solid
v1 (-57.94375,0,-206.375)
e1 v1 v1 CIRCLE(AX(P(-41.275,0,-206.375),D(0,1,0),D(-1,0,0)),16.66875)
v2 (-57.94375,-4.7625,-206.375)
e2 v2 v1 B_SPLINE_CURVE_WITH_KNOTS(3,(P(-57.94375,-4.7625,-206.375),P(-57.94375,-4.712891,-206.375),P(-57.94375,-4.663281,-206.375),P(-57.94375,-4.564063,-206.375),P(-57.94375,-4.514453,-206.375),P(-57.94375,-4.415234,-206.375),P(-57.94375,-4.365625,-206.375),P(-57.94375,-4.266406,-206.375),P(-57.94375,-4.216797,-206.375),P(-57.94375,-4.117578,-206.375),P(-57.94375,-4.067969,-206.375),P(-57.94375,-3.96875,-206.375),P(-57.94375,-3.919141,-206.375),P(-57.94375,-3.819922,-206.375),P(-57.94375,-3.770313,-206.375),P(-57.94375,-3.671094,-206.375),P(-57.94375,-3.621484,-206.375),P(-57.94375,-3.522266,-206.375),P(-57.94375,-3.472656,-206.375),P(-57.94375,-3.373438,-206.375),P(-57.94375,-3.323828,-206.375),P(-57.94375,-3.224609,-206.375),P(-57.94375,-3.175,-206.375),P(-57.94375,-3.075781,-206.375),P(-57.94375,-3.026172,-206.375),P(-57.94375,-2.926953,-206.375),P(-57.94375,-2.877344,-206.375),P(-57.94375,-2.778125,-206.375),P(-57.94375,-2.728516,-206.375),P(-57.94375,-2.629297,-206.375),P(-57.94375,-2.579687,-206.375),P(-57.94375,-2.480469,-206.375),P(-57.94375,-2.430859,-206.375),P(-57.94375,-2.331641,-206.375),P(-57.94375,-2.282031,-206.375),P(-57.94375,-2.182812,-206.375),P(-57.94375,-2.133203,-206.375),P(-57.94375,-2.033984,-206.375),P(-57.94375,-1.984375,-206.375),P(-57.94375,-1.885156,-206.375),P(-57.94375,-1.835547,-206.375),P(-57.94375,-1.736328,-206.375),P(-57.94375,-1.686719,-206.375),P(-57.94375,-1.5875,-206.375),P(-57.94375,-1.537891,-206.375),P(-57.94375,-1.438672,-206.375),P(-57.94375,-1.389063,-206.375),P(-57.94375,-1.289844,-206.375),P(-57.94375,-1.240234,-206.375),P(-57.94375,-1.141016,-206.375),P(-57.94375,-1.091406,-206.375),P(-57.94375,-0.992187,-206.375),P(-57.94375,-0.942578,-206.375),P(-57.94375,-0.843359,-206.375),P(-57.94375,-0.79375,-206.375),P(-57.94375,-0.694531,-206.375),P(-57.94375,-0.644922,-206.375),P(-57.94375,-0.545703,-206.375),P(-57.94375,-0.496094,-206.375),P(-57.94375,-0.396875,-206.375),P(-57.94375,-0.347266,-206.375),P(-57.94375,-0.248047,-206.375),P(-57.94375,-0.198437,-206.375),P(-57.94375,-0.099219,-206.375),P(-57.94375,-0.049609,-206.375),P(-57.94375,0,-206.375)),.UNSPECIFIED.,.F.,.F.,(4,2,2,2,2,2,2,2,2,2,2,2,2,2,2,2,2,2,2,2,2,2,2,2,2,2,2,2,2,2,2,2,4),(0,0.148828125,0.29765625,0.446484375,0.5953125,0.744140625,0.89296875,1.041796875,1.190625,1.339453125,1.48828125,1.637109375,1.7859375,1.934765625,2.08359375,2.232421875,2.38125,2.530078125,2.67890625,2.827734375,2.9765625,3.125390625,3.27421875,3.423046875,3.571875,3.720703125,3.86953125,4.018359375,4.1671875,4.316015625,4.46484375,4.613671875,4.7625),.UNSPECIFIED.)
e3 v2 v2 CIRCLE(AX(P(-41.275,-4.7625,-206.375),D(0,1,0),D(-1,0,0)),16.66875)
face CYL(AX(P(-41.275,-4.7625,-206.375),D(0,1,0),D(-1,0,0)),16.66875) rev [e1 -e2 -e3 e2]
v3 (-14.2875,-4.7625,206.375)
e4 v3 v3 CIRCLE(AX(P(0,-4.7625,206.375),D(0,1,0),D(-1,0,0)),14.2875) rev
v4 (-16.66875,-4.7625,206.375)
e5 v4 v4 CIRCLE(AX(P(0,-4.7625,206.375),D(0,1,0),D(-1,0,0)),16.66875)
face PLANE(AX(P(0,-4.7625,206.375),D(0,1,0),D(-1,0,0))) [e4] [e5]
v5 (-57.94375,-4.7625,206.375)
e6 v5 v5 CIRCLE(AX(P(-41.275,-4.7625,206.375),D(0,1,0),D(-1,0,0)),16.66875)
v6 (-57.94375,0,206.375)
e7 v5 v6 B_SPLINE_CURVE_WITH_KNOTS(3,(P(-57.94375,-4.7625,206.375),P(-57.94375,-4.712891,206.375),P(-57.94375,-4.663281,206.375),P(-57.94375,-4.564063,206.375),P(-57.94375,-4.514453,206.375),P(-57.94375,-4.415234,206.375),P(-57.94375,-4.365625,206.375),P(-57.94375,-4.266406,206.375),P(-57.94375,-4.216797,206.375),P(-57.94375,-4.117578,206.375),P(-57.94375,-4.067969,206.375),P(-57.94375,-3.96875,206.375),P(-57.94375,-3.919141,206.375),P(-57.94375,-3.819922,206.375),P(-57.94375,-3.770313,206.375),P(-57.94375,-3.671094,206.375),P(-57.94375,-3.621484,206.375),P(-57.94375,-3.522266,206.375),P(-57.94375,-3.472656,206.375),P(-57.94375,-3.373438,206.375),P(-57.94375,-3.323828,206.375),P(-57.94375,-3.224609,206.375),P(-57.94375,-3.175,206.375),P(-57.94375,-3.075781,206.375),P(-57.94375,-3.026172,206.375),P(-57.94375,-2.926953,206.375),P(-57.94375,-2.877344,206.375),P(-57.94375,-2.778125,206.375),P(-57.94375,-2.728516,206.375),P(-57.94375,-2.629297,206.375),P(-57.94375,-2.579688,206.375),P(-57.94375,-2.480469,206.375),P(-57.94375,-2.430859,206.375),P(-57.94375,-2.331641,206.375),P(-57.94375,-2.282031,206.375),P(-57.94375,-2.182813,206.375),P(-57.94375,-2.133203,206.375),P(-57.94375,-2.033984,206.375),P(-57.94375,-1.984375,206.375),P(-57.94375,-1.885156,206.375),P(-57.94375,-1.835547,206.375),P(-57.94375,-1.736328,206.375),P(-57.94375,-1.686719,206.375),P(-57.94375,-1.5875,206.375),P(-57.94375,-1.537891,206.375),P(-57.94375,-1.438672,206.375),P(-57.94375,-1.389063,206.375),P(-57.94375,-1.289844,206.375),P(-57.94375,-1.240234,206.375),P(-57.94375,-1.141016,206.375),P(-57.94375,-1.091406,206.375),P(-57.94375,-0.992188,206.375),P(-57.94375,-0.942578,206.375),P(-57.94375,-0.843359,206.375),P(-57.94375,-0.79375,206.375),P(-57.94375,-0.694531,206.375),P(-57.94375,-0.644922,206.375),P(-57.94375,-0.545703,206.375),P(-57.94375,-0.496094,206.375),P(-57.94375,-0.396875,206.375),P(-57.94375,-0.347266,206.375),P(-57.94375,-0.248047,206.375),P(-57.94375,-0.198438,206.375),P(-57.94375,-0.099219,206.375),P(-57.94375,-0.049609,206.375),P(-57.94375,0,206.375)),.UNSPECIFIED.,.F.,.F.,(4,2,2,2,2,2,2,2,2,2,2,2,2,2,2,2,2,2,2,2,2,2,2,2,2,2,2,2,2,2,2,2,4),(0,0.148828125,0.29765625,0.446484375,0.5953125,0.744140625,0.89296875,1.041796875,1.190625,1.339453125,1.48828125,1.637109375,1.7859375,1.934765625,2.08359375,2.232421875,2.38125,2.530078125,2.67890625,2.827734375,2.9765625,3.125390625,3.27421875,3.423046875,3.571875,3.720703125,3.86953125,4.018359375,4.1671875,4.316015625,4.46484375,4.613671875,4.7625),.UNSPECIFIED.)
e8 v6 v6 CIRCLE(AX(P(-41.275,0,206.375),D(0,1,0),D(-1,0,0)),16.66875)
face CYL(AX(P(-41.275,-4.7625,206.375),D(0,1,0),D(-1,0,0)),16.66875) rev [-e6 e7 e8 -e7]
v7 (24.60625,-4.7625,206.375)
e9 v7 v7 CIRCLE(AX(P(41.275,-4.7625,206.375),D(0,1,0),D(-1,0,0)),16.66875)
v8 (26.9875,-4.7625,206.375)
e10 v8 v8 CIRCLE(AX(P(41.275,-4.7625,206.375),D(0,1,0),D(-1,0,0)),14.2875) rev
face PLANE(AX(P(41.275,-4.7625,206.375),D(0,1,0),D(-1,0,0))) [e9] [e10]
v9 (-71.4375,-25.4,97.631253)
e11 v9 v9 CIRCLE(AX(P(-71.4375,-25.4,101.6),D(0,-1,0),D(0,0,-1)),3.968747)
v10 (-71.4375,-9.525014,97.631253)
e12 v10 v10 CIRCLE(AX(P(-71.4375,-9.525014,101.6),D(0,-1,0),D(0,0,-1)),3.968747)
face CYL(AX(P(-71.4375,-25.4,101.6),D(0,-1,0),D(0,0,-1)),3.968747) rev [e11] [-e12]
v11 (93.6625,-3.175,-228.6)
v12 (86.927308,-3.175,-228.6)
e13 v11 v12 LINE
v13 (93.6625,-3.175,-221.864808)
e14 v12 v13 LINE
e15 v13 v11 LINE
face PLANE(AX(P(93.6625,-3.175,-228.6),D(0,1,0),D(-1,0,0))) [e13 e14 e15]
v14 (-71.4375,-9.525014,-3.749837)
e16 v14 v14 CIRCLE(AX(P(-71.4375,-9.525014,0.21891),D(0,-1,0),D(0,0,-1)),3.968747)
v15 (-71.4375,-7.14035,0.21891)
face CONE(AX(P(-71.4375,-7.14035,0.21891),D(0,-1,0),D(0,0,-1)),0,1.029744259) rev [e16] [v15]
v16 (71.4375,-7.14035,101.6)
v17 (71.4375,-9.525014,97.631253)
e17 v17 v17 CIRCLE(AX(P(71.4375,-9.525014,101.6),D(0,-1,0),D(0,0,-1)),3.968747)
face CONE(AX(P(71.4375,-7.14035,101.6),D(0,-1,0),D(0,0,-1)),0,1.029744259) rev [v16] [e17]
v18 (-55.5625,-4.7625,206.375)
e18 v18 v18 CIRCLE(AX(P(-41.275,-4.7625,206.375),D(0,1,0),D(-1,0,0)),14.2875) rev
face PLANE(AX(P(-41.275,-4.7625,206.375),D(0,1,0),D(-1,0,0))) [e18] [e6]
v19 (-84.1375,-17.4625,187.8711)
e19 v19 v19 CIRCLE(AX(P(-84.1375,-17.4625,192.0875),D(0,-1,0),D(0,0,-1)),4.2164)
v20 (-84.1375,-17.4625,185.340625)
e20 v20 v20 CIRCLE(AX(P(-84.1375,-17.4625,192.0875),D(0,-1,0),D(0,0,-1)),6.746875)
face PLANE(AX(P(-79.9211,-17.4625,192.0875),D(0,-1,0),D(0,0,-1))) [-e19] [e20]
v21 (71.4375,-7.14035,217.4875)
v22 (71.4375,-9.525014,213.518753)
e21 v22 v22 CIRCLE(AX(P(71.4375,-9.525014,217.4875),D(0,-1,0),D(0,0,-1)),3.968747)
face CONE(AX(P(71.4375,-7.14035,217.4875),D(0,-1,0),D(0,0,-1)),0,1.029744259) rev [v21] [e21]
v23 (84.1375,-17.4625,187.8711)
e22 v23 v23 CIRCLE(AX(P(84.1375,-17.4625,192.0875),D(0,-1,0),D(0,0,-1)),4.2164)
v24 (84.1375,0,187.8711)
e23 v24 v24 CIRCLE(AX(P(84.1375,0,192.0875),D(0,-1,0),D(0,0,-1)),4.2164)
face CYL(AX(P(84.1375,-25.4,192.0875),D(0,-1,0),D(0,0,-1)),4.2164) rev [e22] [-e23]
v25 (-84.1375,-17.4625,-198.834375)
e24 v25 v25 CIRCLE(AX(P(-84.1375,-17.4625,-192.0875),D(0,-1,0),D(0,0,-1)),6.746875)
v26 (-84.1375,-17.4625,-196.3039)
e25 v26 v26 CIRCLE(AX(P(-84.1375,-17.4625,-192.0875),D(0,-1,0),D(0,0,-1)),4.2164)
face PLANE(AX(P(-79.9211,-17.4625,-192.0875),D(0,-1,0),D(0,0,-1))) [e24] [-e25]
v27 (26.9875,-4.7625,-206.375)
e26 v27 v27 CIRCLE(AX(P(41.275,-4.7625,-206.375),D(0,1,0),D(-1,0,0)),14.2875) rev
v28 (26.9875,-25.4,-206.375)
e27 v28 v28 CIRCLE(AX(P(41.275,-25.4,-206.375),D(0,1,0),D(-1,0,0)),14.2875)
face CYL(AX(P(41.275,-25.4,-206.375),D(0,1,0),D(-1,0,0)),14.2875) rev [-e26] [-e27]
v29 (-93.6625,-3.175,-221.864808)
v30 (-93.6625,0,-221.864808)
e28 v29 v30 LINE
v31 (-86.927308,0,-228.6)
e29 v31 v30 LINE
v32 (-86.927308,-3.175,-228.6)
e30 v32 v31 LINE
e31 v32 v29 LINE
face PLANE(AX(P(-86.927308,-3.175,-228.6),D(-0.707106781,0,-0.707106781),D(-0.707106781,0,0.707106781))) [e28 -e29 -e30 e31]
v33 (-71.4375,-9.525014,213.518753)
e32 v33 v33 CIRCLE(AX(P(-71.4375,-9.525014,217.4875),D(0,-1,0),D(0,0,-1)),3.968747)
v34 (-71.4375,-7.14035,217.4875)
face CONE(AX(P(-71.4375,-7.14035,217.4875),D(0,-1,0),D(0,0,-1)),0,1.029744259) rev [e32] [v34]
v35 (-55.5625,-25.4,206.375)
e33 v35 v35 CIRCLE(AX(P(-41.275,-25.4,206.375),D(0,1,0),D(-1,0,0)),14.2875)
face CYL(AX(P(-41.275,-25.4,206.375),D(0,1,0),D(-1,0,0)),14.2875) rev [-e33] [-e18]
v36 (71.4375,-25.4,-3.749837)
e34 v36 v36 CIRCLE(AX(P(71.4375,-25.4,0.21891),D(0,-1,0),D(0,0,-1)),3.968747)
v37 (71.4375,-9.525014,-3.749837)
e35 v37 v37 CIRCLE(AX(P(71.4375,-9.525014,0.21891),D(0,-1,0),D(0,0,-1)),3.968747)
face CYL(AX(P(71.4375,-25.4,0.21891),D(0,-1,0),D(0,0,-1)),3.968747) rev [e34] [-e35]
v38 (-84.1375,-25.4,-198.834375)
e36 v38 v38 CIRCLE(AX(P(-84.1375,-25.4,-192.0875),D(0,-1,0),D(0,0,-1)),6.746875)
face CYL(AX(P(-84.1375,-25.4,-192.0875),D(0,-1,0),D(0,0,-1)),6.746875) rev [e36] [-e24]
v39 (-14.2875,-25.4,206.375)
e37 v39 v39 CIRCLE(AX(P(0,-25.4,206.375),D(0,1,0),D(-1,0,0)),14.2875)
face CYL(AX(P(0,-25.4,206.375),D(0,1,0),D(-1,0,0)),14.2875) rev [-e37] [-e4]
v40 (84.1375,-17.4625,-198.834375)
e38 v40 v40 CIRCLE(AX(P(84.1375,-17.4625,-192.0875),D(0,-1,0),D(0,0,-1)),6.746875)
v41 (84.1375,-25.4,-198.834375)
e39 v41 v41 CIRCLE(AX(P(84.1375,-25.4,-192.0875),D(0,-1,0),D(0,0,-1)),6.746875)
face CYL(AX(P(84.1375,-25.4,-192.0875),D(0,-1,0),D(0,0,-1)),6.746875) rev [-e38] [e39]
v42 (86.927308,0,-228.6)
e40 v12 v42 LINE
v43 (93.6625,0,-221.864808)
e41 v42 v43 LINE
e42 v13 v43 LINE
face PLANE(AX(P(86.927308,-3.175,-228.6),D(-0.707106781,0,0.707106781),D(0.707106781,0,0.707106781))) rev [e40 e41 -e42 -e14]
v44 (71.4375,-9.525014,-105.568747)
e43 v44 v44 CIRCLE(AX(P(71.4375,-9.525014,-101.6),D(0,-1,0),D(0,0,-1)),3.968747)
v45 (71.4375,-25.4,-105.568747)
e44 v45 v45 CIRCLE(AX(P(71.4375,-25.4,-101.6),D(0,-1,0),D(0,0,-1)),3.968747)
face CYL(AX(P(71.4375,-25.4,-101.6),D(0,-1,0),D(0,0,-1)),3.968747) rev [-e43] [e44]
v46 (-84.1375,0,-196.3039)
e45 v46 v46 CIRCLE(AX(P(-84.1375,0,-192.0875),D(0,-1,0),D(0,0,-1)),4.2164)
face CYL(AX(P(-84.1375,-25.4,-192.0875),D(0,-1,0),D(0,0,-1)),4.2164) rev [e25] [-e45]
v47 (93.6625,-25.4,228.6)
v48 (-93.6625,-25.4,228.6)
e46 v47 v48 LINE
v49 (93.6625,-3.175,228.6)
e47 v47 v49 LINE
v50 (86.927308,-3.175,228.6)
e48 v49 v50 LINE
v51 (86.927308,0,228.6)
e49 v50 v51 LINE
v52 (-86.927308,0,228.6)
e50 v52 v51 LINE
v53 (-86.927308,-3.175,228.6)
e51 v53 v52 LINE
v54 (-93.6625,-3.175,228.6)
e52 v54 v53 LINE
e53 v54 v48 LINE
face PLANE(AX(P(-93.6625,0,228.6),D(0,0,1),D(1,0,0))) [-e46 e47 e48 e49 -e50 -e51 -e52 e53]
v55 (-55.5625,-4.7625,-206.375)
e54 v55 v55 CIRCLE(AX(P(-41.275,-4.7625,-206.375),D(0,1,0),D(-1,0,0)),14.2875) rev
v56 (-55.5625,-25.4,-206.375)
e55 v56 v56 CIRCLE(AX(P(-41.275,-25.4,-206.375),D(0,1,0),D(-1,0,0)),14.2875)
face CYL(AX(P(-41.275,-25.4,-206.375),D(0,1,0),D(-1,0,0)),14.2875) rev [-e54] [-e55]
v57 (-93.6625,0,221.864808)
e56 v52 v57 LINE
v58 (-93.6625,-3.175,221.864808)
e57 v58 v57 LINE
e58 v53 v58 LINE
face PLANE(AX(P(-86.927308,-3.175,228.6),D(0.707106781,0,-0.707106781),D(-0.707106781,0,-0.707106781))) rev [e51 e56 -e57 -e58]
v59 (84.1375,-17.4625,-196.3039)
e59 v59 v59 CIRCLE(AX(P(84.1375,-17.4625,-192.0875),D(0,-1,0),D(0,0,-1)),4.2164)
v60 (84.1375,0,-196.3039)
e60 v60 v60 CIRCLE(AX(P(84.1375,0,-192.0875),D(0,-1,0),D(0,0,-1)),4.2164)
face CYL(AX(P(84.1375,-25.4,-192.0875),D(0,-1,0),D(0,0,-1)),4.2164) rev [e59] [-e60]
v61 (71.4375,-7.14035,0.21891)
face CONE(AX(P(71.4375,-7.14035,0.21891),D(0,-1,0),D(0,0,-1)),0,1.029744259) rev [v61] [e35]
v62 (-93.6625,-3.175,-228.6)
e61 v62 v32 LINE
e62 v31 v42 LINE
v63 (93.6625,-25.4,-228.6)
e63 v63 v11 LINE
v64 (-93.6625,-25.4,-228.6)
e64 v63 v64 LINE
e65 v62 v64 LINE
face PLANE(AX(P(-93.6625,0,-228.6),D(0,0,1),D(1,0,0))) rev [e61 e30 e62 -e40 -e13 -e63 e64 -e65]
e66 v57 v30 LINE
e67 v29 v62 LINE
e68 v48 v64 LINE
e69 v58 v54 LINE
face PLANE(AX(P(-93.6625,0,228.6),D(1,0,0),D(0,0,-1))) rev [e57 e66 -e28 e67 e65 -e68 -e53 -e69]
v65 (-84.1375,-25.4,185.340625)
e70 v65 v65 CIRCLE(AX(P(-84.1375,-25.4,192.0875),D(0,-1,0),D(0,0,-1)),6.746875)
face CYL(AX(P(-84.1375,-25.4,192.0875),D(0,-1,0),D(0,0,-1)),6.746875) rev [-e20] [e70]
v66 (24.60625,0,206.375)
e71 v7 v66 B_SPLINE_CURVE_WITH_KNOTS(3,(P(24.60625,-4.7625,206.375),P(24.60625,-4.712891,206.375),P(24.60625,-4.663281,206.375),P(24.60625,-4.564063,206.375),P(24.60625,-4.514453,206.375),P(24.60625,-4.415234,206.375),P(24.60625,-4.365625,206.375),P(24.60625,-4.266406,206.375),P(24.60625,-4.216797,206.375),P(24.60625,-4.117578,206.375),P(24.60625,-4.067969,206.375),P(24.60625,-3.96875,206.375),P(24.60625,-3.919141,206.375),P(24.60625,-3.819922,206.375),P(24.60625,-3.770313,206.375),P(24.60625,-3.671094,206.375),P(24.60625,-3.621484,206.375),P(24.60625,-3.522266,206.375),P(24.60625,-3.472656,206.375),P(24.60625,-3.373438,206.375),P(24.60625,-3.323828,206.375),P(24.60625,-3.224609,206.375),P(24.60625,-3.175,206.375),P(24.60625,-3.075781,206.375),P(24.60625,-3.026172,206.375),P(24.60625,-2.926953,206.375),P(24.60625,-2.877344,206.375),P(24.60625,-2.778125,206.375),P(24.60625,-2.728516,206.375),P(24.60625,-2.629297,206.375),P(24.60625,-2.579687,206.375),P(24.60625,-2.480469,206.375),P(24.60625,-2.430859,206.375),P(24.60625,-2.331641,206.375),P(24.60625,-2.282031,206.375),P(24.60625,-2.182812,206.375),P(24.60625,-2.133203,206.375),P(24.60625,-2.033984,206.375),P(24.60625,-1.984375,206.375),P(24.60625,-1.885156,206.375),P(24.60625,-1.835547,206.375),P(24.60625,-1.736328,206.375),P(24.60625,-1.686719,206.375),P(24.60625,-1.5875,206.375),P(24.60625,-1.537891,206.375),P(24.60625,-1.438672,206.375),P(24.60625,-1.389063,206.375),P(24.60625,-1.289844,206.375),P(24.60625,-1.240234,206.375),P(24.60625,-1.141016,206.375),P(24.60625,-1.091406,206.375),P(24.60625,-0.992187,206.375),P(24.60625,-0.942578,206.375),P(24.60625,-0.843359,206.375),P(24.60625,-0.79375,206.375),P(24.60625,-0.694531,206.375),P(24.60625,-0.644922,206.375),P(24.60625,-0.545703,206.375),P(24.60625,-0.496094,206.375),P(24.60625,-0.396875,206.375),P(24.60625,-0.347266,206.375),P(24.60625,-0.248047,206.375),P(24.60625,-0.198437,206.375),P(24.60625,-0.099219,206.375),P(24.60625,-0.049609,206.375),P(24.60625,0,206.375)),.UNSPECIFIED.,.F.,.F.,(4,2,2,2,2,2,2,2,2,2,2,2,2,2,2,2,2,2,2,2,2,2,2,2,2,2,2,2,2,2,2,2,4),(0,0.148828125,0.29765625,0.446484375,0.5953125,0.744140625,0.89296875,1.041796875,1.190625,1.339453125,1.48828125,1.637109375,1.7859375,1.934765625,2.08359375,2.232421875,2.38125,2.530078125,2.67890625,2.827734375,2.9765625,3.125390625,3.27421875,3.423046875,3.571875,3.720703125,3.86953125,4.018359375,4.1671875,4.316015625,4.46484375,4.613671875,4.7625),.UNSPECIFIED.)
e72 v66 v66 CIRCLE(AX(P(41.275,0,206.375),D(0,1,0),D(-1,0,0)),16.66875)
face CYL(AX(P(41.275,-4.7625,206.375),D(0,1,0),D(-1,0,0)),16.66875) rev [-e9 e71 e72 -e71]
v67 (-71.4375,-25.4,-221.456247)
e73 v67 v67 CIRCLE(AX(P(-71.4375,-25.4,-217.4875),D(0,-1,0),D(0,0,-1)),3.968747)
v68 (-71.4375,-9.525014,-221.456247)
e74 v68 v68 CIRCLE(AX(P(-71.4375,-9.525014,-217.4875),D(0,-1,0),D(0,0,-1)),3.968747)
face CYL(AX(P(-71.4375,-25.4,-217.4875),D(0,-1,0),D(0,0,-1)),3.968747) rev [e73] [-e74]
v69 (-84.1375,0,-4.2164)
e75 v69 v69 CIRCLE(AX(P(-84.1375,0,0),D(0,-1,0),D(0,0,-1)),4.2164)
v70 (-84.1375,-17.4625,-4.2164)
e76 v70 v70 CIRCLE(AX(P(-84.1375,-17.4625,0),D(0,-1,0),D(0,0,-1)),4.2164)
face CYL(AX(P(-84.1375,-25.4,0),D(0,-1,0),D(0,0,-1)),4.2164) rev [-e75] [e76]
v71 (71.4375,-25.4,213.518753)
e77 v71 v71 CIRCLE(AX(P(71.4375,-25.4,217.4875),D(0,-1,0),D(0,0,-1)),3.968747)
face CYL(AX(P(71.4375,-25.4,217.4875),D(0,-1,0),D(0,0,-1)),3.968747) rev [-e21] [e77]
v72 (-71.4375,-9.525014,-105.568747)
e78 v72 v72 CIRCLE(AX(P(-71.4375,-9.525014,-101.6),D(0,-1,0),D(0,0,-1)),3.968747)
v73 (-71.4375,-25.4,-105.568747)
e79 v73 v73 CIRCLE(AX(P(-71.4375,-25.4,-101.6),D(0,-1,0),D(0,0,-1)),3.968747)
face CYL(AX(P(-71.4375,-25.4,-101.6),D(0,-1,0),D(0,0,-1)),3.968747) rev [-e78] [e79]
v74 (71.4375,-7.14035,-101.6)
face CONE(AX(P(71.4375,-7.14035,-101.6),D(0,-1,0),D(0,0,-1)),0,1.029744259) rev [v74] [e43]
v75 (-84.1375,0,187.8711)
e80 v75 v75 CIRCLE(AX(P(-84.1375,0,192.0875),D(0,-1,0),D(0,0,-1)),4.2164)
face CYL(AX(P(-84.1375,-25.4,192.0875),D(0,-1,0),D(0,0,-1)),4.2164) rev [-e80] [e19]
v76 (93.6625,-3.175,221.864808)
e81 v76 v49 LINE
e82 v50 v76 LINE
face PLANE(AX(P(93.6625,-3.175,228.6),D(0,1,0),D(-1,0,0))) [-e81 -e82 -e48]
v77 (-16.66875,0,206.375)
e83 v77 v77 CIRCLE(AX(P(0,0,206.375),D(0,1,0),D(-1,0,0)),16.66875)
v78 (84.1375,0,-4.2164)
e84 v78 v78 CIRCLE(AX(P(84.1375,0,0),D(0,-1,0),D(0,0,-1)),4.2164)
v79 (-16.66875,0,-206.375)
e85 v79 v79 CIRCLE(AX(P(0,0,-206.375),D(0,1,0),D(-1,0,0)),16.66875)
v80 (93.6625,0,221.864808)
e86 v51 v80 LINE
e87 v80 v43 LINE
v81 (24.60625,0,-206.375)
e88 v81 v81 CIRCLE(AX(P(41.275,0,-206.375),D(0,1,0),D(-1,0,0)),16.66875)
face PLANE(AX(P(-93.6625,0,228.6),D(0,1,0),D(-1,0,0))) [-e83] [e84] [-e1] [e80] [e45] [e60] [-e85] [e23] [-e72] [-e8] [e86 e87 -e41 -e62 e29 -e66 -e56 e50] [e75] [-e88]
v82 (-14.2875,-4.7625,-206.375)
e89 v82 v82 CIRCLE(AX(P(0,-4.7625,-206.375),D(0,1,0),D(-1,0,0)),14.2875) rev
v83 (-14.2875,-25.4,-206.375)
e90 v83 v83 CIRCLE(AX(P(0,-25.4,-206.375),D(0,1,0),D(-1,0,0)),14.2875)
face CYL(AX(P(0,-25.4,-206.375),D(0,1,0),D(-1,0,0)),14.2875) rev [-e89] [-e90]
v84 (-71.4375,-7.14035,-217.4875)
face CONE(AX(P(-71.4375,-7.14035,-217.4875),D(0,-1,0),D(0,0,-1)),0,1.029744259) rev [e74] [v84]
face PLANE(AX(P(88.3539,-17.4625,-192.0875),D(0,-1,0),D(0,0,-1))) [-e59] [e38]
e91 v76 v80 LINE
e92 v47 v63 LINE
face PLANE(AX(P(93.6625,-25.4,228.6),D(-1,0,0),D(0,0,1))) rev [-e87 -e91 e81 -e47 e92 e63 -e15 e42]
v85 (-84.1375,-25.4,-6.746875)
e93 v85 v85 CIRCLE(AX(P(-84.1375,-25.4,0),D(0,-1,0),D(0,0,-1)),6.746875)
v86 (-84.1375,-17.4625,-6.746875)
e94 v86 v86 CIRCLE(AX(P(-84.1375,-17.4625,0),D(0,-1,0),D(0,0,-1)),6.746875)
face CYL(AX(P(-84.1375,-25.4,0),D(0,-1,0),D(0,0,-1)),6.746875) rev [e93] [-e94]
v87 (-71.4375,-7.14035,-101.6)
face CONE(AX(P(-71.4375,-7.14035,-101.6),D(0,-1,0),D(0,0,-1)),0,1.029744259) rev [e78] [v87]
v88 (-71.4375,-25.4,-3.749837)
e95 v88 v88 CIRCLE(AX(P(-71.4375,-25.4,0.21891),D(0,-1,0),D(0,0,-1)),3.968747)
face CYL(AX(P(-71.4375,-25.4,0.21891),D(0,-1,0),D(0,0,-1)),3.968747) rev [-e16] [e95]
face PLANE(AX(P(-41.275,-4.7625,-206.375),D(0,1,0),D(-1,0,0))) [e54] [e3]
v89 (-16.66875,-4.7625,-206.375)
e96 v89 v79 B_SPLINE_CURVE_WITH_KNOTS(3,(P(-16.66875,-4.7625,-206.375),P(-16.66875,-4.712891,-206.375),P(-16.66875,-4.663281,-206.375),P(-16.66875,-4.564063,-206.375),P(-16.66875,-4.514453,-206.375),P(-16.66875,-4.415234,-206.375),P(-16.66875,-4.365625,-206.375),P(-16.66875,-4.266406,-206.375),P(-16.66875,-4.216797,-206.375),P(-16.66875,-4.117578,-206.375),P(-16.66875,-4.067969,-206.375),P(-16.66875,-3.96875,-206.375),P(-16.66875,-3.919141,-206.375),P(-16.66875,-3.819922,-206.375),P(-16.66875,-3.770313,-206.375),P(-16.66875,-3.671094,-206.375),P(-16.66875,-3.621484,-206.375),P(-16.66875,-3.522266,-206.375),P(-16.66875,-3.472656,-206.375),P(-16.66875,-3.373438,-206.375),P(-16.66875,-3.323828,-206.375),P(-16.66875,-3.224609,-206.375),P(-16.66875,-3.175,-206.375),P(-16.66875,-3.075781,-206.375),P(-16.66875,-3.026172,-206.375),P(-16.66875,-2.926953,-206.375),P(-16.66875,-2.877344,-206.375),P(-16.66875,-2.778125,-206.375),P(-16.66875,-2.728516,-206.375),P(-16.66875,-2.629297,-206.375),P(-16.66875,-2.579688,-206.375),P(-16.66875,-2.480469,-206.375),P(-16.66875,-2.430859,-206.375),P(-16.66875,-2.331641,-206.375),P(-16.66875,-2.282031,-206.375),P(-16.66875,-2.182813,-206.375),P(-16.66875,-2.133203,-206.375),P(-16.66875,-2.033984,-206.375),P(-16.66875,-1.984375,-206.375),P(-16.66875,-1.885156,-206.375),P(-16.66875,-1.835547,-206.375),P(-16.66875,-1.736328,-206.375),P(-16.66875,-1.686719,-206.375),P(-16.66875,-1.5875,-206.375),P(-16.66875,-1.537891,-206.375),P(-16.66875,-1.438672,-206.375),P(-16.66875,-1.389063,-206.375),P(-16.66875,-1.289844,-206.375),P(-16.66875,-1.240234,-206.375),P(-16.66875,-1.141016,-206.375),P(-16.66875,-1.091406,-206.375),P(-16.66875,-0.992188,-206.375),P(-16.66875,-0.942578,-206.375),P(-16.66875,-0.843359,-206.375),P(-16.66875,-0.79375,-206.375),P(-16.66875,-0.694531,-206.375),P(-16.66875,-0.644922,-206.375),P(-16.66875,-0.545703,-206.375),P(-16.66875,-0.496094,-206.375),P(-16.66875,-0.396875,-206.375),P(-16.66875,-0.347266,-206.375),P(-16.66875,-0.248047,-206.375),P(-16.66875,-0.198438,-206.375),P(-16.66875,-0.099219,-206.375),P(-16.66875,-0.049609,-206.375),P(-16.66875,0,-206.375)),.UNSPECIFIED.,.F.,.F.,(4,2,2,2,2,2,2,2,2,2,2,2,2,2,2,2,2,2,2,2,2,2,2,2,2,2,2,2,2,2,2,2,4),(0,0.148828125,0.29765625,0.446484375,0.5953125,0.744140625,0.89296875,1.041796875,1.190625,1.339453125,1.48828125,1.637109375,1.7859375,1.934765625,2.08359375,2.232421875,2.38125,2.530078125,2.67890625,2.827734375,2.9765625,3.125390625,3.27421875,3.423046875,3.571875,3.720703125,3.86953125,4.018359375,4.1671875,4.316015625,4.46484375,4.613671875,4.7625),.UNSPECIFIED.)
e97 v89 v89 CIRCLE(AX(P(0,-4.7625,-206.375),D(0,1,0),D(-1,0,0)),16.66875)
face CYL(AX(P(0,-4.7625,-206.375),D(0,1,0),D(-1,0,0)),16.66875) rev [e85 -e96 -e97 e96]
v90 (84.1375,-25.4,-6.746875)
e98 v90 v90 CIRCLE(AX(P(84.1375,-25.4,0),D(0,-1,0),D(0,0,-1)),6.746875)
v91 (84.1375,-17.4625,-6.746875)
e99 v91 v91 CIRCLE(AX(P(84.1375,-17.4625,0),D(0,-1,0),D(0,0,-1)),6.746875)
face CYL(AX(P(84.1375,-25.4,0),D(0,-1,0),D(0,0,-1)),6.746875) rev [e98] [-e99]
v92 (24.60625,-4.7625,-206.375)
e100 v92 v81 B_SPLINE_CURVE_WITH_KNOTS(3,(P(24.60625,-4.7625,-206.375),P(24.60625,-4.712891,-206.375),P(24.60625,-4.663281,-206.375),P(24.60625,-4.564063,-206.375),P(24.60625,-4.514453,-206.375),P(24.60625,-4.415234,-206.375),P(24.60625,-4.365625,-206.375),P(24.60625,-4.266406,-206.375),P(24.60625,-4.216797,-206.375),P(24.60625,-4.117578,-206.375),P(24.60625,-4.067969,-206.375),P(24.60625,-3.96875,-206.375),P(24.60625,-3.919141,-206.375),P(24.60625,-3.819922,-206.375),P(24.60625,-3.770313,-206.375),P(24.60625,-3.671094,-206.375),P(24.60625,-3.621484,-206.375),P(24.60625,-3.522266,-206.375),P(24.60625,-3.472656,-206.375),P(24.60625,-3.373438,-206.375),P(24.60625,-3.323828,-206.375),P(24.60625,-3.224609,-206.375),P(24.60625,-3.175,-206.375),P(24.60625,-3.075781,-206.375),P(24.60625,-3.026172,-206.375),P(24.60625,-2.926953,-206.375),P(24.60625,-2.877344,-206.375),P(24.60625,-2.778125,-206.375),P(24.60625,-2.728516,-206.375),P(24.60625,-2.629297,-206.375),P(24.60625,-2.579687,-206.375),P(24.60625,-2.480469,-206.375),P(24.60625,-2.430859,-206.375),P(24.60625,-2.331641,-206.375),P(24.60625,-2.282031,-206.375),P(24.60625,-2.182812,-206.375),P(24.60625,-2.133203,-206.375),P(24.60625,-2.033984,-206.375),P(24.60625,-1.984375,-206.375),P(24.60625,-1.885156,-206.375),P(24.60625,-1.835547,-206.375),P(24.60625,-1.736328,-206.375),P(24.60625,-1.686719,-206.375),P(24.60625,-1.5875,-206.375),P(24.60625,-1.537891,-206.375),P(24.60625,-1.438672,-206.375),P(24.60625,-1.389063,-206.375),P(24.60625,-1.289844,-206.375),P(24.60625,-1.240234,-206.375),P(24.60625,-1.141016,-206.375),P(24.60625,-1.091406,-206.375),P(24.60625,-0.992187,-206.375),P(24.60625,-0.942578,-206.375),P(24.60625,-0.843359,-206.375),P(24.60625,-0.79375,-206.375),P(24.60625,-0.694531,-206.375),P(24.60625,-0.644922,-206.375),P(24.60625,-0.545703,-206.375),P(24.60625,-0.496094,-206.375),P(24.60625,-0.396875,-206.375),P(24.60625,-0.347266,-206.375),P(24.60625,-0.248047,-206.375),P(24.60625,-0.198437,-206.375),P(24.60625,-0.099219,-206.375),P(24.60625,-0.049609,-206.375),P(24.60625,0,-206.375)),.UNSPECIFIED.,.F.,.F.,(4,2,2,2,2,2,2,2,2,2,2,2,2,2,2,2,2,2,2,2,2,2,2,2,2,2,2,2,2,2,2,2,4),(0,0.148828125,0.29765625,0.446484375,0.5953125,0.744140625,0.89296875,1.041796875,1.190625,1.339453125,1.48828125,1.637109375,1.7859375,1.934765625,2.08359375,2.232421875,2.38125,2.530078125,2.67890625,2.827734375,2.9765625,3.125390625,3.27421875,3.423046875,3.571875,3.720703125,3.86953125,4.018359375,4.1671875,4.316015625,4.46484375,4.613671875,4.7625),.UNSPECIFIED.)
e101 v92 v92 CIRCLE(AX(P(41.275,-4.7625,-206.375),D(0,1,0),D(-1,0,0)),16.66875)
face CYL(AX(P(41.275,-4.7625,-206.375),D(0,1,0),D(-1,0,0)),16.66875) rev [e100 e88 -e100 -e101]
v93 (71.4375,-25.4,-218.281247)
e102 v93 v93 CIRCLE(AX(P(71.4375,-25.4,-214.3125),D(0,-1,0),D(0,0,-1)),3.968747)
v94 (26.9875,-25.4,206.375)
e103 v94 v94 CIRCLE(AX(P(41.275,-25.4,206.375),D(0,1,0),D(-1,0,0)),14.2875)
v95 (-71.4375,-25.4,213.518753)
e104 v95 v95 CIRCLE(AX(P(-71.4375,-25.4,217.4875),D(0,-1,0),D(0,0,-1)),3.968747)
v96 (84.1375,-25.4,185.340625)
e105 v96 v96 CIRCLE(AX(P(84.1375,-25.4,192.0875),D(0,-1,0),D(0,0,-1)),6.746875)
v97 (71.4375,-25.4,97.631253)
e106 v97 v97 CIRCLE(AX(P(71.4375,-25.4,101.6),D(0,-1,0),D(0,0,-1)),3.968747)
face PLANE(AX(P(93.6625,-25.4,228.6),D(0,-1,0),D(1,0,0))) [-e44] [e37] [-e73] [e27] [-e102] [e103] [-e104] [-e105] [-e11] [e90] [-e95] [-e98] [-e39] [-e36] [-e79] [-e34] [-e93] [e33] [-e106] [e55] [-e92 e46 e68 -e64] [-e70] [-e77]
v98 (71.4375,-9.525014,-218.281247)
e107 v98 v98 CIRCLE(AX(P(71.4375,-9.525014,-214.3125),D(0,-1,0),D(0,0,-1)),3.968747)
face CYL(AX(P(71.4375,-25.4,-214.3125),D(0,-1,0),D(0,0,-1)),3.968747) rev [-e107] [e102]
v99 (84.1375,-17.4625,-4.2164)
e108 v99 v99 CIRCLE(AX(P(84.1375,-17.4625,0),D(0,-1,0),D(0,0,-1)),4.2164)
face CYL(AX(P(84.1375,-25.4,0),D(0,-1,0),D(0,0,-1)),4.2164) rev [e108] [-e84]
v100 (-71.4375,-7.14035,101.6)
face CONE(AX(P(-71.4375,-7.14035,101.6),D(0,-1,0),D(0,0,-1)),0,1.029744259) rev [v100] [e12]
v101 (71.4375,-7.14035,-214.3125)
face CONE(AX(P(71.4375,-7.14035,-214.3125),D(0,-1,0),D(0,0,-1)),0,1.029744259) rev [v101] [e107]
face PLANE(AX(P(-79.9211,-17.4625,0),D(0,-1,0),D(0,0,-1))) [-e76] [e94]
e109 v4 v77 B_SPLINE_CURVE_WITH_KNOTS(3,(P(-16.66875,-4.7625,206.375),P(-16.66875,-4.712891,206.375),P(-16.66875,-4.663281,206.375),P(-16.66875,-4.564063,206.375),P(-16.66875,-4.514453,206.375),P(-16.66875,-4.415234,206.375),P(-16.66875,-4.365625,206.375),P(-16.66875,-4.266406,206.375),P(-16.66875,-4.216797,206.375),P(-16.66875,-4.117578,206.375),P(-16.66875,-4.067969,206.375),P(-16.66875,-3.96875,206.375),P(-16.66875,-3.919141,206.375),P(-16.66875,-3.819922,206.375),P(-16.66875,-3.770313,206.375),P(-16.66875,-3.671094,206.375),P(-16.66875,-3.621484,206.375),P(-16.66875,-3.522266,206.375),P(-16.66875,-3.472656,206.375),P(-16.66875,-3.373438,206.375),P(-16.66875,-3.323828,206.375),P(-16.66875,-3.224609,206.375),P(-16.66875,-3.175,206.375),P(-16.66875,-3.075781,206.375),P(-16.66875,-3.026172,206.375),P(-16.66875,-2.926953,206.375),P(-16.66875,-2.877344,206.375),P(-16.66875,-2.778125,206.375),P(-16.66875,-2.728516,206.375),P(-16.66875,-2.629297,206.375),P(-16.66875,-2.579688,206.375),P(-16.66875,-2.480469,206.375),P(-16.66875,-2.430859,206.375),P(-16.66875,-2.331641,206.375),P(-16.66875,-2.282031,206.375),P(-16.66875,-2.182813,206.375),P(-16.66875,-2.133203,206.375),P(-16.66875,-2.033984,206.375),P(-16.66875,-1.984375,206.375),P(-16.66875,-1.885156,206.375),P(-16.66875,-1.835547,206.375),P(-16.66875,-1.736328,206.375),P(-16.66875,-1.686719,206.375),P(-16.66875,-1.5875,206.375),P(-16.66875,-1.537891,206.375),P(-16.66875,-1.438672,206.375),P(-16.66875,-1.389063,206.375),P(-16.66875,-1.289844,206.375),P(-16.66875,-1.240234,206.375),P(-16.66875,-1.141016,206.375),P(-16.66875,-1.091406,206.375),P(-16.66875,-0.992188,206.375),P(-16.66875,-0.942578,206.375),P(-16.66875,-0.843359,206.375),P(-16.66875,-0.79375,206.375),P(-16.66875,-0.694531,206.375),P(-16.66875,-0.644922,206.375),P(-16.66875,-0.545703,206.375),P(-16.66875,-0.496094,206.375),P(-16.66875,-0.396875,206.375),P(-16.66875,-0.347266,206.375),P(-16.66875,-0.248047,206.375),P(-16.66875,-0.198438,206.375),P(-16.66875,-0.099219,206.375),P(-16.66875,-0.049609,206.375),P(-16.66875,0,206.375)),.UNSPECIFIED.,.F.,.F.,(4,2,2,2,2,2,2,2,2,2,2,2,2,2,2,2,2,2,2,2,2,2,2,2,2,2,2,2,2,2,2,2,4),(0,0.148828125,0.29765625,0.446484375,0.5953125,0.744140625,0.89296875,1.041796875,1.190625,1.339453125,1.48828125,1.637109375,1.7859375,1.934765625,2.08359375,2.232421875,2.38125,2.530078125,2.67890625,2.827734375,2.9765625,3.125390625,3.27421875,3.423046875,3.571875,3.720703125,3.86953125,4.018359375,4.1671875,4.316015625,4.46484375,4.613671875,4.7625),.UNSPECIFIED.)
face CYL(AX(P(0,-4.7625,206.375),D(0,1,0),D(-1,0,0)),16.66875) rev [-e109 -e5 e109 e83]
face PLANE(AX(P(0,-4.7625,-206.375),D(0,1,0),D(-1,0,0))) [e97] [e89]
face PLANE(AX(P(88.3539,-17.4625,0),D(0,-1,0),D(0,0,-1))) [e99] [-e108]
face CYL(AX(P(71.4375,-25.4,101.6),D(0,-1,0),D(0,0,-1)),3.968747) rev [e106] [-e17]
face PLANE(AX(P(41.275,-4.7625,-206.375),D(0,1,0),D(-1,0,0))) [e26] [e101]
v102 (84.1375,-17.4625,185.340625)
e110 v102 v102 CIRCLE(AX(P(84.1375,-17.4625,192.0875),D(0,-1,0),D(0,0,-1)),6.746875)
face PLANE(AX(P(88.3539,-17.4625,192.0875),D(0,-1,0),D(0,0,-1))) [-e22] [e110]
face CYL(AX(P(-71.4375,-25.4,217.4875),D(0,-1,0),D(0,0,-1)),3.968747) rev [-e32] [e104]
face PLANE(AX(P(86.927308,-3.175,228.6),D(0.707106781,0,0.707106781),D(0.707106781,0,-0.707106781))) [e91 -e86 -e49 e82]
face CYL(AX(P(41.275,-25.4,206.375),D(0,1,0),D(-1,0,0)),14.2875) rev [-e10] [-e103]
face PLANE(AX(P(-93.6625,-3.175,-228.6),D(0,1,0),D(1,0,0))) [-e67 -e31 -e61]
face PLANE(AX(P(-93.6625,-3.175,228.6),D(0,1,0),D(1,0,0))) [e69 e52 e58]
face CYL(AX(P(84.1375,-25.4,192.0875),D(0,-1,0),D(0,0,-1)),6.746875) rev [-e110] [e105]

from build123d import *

# Parameters (mm, degrees)
SKETCH1_W            = 187.325
SKETCH1_H            = 25.4
BASE_EXTRUDE_DEPTH   = 228.6
CBORE1_D             = 8.4328
CBORE1_CBORE_D       = 13.49375
CBORE1_CBORE_DEPTH   = 7.9375
CBORE2_D             = 8.4328
CBORE2_CBORE_D       = 13.49375
CBORE2_CBORE_DEPTH   = 7.9375
CBORE3_D             = 8.4328
CBORE3_CBORE_D       = 13.49375
CBORE3_CBORE_DEPTH   = 7.9375
CBORE4_D             = 8.4328
CBORE4_CBORE_D       = 13.49375
CBORE4_CBORE_DEPTH   = 7.9375
CUT_EXTRUDE1_DEPTH   = 3.175
MIRROR2_COPY_1_DEPTH = 3.175
GUIDE1_START         = -25.4
GUIDE1_OUTLINE_R     = 14.2875
GUIDE1_DEPTH         = 25.4
CBORE5_START         = -25.4
CBORE5_OUTLINE_R     = 14.2875
CBORE5_OUTLINE_R_2   = 4.2164
CBORE5_DEPTH         = 25.4
CBORE5_START_2       = -4.7625
CBORE5_2_OUTLINE_R   = 16.66875
CBORE5_2_OUTLINE_R_2 = 14.2875
CBORE5_2_DEPTH       = 4.7625
CBORE5_3_OUTLINE_R   = 6.746875
CBORE5_3_OUTLINE_R_2 = 4.2164
CBORE5_3_DEPTH       = 7.9375
CBORE6_D             = 8.4328
CBORE6_CBORE_D       = 13.49375
CBORE6_CBORE_DEPTH   = 7.9375


# Read off the part's stored shape, not the designer's step: Guide1, CBORE5
with BuildPart() as part:
    # Sketch1 → Base-Extrude (new, symmetric)
    with BuildSketch(Plane.XY):
        with Locations((0, -12.7)):
            Rectangle(SKETCH1_W, SKETCH1_H)
    extrude(amount=BASE_EXTRUDE_DEPTH, both=True)

    # CBORE1 (through all)
    with Locations(Plane.XZ.offset(25.4)):
        with Locations((84.1375, -192.0875)):
            CounterBoreHole(CBORE1_D / 2, CBORE1_CBORE_D / 2, CBORE1_CBORE_DEPTH)

    # CBORE2 (through all)
    with Locations(Plane.XZ.offset(25.4)):
        with Locations((84.1375, 192.0875)):
            CounterBoreHole(CBORE2_D / 2, CBORE2_CBORE_D / 2, CBORE2_CBORE_DEPTH)

    # CBORE3 (through all)
    with Locations(Plane.XZ.offset(25.4)):
        with Locations((-84.1375, 192.0875)):
            CounterBoreHole(CBORE3_D / 2, CBORE3_CBORE_D / 2, CBORE3_CBORE_DEPTH)

    # CBORE4 (through all)
    with Locations(Plane.XZ.offset(25.4)):
        with Locations((-84.1375, -192.0875)):
            CounterBoreHole(CBORE4_D / 2, CBORE4_CBORE_D / 2, CBORE4_CBORE_DEPTH)

    # Sketch3 → Cut-Extrude1 (cut)
    with BuildSketch(Plane(origin=(0, 0, 0), x_dir=(-1, 0, 0), z_dir=(0, 1, 0))):
        Polygon((-86.927307909, 228.6), (-93.6625, 221.864807909), (-93.6625, 228.6), align=None)
    cut_extrude1 = extrude(amount=-CUT_EXTRUDE1_DEPTH, mode=Mode.SUBTRACT)

    # Mirror1: Cut-Extrude1 across plane
    add(cut_extrude1.mirror(Plane(origin=(0, 0, 0), x_dir=(0, 0, 1), z_dir=(1, 0, 0))), mode=Mode.SUBTRACT)

    # Mirror2: Cut-Extrude1 across plane
    add(cut_extrude1.mirror(Plane.XY), mode=Mode.SUBTRACT)

    # Mirror2 copy 1 sketch → Mirror2 copy 1 (cut)
    with BuildSketch(Plane(origin=(0, 0, 0), x_dir=(1, 0, 0), z_dir=(0, 1, 0))):
        Polygon((-86.927307909, 228.6), (-93.6625, 221.864807909), (-93.6625, 228.6), align=None)
    extrude(amount=-MIRROR2_COPY_1_DEPTH, mode=Mode.SUBTRACT)

    # SP1rev → SP1 (revolve, cut)
    with BuildSketch(Plane(origin=(-71.4375, -25.4, -217.4875), x_dir=(0, 0, -1), z_dir=(1, 0, 0))):
        Polygon((0, 0), (0, 18.259649766), (3.968746562, 15.87498625), (3.968746562, 0.002539998), (3.968746563, 0), align=None)
    revolve(axis=Axis((-71.4375, -31.75, -217.4875), (0, 1, 0)), mode=Mode.SUBTRACT)

    # SP2rev → SP2 (revolve, cut)
    with BuildSketch(Plane(origin=(-71.4375, -25.4, 217.4875), x_dir=(0, 0, -1), z_dir=(1, 0, 0))):
        Polygon((0, 0), (0, 18.259649766), (3.968746562, 15.87498625), (3.968746562, 0.002539998), (3.968746563, 0), align=None)
    sp2 = revolve(axis=Axis((-71.4375, -31.75, 217.4875), (0, 1, 0)), mode=Mode.SUBTRACT)

    # SP3rev → SP3 (revolve, cut)
    with BuildSketch(Plane(origin=(-71.4375, -25.4, 0.218909537), x_dir=(0, 0, -1), z_dir=(1, 0, 0))):
        Polygon((0, 0), (0, 18.259649766), (3.968746562, 15.87498625), (3.968746562, 0.002539998), (3.968746563, 0), align=None)
    sp3 = revolve(axis=Axis((-71.4375, -31.75, 0.218909537), (0, 1, 0)), mode=Mode.SUBTRACT)

    # SP4rev → SP4 (revolve, cut)
    with BuildSketch(Plane(origin=(-71.4375, -25.4, 101.6), x_dir=(0, 0, -1), z_dir=(1, 0, 0))):
        Polygon((0, 0), (0, 18.259649766), (3.968746562, 15.87498625), (3.968746562, 0.002539998), (3.968746563, 0), align=None)
    sp4 = revolve(axis=Axis((-71.4375, -31.75, 101.6), (0, 1, 0)), mode=Mode.SUBTRACT)

    # SP5rev → SP5 (revolve, cut)
    with BuildSketch(Plane(origin=(-71.4375, -25.4, -101.6), x_dir=(0, 0, -1), z_dir=(1, 0, 0))):
        Polygon((0, 0), (0, 18.259649766), (3.968746562, 15.87498625), (3.968746562, 0.002539998), (3.968746563, 0), align=None)
    sp5 = revolve(axis=Axis((-71.4375, -31.75, -101.6), (0, 1, 0)), mode=Mode.SUBTRACT)

    # SP6rev → SP6 (revolve, cut)
    with BuildSketch(Plane(origin=(71.4375, -25.4, -214.3125), x_dir=(0, 0, -1), z_dir=(1, 0, 0))):
        Polygon((0, 0), (0, 18.259649766), (3.968746562, 15.87498625), (3.968746562, 0.002539998), (3.968746563, 0), align=None)
    revolve(axis=Axis((71.4375, -31.75, -214.3125), (0, 1, 0)), mode=Mode.SUBTRACT)

    # Guide1 outline → Guide1 (cut)
    with BuildSketch(Plane(origin=(0, 0, 0), x_dir=(1, 0, 0), z_dir=(0, 1, 0)).offset(GUIDE1_START)):
        with Locations((41.275, 206.375)):
            Circle(GUIDE1_OUTLINE_R)
    extrude(amount=GUIDE1_DEPTH, mode=Mode.SUBTRACT)

    # CBORE5 outline → CBORE5 (cut)
    with BuildSketch(Plane(origin=(0, 0, 0), x_dir=(1, 0, 0), z_dir=(0, 1, 0)).offset(CBORE5_START)):
        with Locations((0, -206.375)):
            Circle(CBORE5_OUTLINE_R)
        with Locations((0, 206.375)):
            Circle(CBORE5_OUTLINE_R)
        with Locations((-41.275, 206.375)):
            Circle(CBORE5_OUTLINE_R)
        with Locations((-41.275, -206.375)):
            Circle(CBORE5_OUTLINE_R)
        with Locations((41.275, -206.375)):
            Circle(CBORE5_OUTLINE_R)
        with Locations((84.1375, 0)):
            Circle(CBORE5_OUTLINE_R_2)
    extrude(amount=CBORE5_DEPTH, mode=Mode.SUBTRACT)

    # CBORE5 2 outline → CBORE5 2 (cut)
    # profile 1 of 6: a face of its own
    with BuildSketch(Plane(origin=(0, 0, 0), x_dir=(1, 0, 0), z_dir=(0, 1, 0)).offset(CBORE5_START_2)):
        with Locations((41.275, 206.375)):
            Circle(CBORE5_2_OUTLINE_R)
        with Locations((41.275, 206.375)):
            Circle(CBORE5_2_OUTLINE_R_2, mode=Mode.SUBTRACT)
    # profile 2 of 6: a face of its own
    with BuildSketch(Plane(origin=(0, 0, 0), x_dir=(1, 0, 0), z_dir=(0, 1, 0)).offset(CBORE5_START_2)):
        with Locations((41.275, -206.375)):
            Circle(CBORE5_2_OUTLINE_R)
        with Locations((41.275, -206.375)):
            Circle(CBORE5_2_OUTLINE_R_2, mode=Mode.SUBTRACT)
    # profile 3 of 6: a face of its own
    with BuildSketch(Plane(origin=(0, 0, 0), x_dir=(1, 0, 0), z_dir=(0, 1, 0)).offset(CBORE5_START_2)):
        with Locations((-41.275, -206.375)):
            Circle(CBORE5_2_OUTLINE_R)
        with Locations((-41.275, -206.375)):
            Circle(CBORE5_2_OUTLINE_R_2, mode=Mode.SUBTRACT)
    # profile 4 of 6: a face of its own
    with BuildSketch(Plane(origin=(0, 0, 0), x_dir=(1, 0, 0), z_dir=(0, 1, 0)).offset(CBORE5_START_2)):
        with Locations((-41.275, 206.375)):
            Circle(CBORE5_2_OUTLINE_R)
        with Locations((-41.275, 206.375)):
            Circle(CBORE5_2_OUTLINE_R_2, mode=Mode.SUBTRACT)
    # profile 5 of 6: a face of its own
    with BuildSketch(Plane(origin=(0, 0, 0), x_dir=(1, 0, 0), z_dir=(0, 1, 0)).offset(CBORE5_START_2)):
        with Locations((0, 206.375)):
            Circle(CBORE5_2_OUTLINE_R)
        with Locations((0, 206.375)):
            Circle(CBORE5_2_OUTLINE_R_2, mode=Mode.SUBTRACT)
    # profile 6 of 6: a face of its own
    with BuildSketch(Plane(origin=(0, 0, 0), x_dir=(1, 0, 0), z_dir=(0, 1, 0)).offset(CBORE5_START_2)):
        with Locations((0, -206.375)):
            Circle(CBORE5_2_OUTLINE_R)
        with Locations((0, -206.375)):
            Circle(CBORE5_2_OUTLINE_R_2, mode=Mode.SUBTRACT)
    extrude(amount=CBORE5_2_DEPTH, mode=Mode.SUBTRACT)

    # CBORE5 3 outline → CBORE5 3 (cut)
    with BuildSketch(Plane(origin=(0, 0, 0), x_dir=(1, 0, 0), z_dir=(0, 1, 0)).offset(CBORE5_START)):
        with Locations((84.1375, 0)):
            Circle(CBORE5_3_OUTLINE_R)
        with Locations((84.1375, 0)):
            Circle(CBORE5_3_OUTLINE_R_2, mode=Mode.SUBTRACT)
    extrude(amount=CBORE5_3_DEPTH, mode=Mode.SUBTRACT)

    # CBORE6 (through all)
    with Locations(Plane(origin=(-174.013483356, -25.4, 84.713166839), x_dir=(1, 0, 0), z_dir=(0, -1, 0))):
        with Locations((89.875983356, -84.713166839)):
            CounterBoreHole(CBORE6_D / 2, CBORE6_CBORE_D / 2, CBORE6_CBORE_DEPTH)

    # Mirror3: SP3 across plane
    add(sp3.mirror(Plane(origin=(0, 0, 0), x_dir=(0, 0, 1), z_dir=(1, 0, 0))), mode=Mode.SUBTRACT)

    # Mirror4: SP4, SP5 across plane
    add(sp4.mirror(Plane(origin=(0, 0, 0), x_dir=(0, 0, 1), z_dir=(1, 0, 0))), mode=Mode.SUBTRACT)
    add(sp5.mirror(Plane(origin=(0, 0, 0), x_dir=(0, 0, 1), z_dir=(1, 0, 0))), mode=Mode.SUBTRACT)

    # Mirror5: SP2 across plane
    add(sp2.mirror(Plane(origin=(0, 0, 0), x_dir=(0, 0, 1), z_dir=(1, 0, 0))), mode=Mode.SUBTRACT)


solid = part.part
